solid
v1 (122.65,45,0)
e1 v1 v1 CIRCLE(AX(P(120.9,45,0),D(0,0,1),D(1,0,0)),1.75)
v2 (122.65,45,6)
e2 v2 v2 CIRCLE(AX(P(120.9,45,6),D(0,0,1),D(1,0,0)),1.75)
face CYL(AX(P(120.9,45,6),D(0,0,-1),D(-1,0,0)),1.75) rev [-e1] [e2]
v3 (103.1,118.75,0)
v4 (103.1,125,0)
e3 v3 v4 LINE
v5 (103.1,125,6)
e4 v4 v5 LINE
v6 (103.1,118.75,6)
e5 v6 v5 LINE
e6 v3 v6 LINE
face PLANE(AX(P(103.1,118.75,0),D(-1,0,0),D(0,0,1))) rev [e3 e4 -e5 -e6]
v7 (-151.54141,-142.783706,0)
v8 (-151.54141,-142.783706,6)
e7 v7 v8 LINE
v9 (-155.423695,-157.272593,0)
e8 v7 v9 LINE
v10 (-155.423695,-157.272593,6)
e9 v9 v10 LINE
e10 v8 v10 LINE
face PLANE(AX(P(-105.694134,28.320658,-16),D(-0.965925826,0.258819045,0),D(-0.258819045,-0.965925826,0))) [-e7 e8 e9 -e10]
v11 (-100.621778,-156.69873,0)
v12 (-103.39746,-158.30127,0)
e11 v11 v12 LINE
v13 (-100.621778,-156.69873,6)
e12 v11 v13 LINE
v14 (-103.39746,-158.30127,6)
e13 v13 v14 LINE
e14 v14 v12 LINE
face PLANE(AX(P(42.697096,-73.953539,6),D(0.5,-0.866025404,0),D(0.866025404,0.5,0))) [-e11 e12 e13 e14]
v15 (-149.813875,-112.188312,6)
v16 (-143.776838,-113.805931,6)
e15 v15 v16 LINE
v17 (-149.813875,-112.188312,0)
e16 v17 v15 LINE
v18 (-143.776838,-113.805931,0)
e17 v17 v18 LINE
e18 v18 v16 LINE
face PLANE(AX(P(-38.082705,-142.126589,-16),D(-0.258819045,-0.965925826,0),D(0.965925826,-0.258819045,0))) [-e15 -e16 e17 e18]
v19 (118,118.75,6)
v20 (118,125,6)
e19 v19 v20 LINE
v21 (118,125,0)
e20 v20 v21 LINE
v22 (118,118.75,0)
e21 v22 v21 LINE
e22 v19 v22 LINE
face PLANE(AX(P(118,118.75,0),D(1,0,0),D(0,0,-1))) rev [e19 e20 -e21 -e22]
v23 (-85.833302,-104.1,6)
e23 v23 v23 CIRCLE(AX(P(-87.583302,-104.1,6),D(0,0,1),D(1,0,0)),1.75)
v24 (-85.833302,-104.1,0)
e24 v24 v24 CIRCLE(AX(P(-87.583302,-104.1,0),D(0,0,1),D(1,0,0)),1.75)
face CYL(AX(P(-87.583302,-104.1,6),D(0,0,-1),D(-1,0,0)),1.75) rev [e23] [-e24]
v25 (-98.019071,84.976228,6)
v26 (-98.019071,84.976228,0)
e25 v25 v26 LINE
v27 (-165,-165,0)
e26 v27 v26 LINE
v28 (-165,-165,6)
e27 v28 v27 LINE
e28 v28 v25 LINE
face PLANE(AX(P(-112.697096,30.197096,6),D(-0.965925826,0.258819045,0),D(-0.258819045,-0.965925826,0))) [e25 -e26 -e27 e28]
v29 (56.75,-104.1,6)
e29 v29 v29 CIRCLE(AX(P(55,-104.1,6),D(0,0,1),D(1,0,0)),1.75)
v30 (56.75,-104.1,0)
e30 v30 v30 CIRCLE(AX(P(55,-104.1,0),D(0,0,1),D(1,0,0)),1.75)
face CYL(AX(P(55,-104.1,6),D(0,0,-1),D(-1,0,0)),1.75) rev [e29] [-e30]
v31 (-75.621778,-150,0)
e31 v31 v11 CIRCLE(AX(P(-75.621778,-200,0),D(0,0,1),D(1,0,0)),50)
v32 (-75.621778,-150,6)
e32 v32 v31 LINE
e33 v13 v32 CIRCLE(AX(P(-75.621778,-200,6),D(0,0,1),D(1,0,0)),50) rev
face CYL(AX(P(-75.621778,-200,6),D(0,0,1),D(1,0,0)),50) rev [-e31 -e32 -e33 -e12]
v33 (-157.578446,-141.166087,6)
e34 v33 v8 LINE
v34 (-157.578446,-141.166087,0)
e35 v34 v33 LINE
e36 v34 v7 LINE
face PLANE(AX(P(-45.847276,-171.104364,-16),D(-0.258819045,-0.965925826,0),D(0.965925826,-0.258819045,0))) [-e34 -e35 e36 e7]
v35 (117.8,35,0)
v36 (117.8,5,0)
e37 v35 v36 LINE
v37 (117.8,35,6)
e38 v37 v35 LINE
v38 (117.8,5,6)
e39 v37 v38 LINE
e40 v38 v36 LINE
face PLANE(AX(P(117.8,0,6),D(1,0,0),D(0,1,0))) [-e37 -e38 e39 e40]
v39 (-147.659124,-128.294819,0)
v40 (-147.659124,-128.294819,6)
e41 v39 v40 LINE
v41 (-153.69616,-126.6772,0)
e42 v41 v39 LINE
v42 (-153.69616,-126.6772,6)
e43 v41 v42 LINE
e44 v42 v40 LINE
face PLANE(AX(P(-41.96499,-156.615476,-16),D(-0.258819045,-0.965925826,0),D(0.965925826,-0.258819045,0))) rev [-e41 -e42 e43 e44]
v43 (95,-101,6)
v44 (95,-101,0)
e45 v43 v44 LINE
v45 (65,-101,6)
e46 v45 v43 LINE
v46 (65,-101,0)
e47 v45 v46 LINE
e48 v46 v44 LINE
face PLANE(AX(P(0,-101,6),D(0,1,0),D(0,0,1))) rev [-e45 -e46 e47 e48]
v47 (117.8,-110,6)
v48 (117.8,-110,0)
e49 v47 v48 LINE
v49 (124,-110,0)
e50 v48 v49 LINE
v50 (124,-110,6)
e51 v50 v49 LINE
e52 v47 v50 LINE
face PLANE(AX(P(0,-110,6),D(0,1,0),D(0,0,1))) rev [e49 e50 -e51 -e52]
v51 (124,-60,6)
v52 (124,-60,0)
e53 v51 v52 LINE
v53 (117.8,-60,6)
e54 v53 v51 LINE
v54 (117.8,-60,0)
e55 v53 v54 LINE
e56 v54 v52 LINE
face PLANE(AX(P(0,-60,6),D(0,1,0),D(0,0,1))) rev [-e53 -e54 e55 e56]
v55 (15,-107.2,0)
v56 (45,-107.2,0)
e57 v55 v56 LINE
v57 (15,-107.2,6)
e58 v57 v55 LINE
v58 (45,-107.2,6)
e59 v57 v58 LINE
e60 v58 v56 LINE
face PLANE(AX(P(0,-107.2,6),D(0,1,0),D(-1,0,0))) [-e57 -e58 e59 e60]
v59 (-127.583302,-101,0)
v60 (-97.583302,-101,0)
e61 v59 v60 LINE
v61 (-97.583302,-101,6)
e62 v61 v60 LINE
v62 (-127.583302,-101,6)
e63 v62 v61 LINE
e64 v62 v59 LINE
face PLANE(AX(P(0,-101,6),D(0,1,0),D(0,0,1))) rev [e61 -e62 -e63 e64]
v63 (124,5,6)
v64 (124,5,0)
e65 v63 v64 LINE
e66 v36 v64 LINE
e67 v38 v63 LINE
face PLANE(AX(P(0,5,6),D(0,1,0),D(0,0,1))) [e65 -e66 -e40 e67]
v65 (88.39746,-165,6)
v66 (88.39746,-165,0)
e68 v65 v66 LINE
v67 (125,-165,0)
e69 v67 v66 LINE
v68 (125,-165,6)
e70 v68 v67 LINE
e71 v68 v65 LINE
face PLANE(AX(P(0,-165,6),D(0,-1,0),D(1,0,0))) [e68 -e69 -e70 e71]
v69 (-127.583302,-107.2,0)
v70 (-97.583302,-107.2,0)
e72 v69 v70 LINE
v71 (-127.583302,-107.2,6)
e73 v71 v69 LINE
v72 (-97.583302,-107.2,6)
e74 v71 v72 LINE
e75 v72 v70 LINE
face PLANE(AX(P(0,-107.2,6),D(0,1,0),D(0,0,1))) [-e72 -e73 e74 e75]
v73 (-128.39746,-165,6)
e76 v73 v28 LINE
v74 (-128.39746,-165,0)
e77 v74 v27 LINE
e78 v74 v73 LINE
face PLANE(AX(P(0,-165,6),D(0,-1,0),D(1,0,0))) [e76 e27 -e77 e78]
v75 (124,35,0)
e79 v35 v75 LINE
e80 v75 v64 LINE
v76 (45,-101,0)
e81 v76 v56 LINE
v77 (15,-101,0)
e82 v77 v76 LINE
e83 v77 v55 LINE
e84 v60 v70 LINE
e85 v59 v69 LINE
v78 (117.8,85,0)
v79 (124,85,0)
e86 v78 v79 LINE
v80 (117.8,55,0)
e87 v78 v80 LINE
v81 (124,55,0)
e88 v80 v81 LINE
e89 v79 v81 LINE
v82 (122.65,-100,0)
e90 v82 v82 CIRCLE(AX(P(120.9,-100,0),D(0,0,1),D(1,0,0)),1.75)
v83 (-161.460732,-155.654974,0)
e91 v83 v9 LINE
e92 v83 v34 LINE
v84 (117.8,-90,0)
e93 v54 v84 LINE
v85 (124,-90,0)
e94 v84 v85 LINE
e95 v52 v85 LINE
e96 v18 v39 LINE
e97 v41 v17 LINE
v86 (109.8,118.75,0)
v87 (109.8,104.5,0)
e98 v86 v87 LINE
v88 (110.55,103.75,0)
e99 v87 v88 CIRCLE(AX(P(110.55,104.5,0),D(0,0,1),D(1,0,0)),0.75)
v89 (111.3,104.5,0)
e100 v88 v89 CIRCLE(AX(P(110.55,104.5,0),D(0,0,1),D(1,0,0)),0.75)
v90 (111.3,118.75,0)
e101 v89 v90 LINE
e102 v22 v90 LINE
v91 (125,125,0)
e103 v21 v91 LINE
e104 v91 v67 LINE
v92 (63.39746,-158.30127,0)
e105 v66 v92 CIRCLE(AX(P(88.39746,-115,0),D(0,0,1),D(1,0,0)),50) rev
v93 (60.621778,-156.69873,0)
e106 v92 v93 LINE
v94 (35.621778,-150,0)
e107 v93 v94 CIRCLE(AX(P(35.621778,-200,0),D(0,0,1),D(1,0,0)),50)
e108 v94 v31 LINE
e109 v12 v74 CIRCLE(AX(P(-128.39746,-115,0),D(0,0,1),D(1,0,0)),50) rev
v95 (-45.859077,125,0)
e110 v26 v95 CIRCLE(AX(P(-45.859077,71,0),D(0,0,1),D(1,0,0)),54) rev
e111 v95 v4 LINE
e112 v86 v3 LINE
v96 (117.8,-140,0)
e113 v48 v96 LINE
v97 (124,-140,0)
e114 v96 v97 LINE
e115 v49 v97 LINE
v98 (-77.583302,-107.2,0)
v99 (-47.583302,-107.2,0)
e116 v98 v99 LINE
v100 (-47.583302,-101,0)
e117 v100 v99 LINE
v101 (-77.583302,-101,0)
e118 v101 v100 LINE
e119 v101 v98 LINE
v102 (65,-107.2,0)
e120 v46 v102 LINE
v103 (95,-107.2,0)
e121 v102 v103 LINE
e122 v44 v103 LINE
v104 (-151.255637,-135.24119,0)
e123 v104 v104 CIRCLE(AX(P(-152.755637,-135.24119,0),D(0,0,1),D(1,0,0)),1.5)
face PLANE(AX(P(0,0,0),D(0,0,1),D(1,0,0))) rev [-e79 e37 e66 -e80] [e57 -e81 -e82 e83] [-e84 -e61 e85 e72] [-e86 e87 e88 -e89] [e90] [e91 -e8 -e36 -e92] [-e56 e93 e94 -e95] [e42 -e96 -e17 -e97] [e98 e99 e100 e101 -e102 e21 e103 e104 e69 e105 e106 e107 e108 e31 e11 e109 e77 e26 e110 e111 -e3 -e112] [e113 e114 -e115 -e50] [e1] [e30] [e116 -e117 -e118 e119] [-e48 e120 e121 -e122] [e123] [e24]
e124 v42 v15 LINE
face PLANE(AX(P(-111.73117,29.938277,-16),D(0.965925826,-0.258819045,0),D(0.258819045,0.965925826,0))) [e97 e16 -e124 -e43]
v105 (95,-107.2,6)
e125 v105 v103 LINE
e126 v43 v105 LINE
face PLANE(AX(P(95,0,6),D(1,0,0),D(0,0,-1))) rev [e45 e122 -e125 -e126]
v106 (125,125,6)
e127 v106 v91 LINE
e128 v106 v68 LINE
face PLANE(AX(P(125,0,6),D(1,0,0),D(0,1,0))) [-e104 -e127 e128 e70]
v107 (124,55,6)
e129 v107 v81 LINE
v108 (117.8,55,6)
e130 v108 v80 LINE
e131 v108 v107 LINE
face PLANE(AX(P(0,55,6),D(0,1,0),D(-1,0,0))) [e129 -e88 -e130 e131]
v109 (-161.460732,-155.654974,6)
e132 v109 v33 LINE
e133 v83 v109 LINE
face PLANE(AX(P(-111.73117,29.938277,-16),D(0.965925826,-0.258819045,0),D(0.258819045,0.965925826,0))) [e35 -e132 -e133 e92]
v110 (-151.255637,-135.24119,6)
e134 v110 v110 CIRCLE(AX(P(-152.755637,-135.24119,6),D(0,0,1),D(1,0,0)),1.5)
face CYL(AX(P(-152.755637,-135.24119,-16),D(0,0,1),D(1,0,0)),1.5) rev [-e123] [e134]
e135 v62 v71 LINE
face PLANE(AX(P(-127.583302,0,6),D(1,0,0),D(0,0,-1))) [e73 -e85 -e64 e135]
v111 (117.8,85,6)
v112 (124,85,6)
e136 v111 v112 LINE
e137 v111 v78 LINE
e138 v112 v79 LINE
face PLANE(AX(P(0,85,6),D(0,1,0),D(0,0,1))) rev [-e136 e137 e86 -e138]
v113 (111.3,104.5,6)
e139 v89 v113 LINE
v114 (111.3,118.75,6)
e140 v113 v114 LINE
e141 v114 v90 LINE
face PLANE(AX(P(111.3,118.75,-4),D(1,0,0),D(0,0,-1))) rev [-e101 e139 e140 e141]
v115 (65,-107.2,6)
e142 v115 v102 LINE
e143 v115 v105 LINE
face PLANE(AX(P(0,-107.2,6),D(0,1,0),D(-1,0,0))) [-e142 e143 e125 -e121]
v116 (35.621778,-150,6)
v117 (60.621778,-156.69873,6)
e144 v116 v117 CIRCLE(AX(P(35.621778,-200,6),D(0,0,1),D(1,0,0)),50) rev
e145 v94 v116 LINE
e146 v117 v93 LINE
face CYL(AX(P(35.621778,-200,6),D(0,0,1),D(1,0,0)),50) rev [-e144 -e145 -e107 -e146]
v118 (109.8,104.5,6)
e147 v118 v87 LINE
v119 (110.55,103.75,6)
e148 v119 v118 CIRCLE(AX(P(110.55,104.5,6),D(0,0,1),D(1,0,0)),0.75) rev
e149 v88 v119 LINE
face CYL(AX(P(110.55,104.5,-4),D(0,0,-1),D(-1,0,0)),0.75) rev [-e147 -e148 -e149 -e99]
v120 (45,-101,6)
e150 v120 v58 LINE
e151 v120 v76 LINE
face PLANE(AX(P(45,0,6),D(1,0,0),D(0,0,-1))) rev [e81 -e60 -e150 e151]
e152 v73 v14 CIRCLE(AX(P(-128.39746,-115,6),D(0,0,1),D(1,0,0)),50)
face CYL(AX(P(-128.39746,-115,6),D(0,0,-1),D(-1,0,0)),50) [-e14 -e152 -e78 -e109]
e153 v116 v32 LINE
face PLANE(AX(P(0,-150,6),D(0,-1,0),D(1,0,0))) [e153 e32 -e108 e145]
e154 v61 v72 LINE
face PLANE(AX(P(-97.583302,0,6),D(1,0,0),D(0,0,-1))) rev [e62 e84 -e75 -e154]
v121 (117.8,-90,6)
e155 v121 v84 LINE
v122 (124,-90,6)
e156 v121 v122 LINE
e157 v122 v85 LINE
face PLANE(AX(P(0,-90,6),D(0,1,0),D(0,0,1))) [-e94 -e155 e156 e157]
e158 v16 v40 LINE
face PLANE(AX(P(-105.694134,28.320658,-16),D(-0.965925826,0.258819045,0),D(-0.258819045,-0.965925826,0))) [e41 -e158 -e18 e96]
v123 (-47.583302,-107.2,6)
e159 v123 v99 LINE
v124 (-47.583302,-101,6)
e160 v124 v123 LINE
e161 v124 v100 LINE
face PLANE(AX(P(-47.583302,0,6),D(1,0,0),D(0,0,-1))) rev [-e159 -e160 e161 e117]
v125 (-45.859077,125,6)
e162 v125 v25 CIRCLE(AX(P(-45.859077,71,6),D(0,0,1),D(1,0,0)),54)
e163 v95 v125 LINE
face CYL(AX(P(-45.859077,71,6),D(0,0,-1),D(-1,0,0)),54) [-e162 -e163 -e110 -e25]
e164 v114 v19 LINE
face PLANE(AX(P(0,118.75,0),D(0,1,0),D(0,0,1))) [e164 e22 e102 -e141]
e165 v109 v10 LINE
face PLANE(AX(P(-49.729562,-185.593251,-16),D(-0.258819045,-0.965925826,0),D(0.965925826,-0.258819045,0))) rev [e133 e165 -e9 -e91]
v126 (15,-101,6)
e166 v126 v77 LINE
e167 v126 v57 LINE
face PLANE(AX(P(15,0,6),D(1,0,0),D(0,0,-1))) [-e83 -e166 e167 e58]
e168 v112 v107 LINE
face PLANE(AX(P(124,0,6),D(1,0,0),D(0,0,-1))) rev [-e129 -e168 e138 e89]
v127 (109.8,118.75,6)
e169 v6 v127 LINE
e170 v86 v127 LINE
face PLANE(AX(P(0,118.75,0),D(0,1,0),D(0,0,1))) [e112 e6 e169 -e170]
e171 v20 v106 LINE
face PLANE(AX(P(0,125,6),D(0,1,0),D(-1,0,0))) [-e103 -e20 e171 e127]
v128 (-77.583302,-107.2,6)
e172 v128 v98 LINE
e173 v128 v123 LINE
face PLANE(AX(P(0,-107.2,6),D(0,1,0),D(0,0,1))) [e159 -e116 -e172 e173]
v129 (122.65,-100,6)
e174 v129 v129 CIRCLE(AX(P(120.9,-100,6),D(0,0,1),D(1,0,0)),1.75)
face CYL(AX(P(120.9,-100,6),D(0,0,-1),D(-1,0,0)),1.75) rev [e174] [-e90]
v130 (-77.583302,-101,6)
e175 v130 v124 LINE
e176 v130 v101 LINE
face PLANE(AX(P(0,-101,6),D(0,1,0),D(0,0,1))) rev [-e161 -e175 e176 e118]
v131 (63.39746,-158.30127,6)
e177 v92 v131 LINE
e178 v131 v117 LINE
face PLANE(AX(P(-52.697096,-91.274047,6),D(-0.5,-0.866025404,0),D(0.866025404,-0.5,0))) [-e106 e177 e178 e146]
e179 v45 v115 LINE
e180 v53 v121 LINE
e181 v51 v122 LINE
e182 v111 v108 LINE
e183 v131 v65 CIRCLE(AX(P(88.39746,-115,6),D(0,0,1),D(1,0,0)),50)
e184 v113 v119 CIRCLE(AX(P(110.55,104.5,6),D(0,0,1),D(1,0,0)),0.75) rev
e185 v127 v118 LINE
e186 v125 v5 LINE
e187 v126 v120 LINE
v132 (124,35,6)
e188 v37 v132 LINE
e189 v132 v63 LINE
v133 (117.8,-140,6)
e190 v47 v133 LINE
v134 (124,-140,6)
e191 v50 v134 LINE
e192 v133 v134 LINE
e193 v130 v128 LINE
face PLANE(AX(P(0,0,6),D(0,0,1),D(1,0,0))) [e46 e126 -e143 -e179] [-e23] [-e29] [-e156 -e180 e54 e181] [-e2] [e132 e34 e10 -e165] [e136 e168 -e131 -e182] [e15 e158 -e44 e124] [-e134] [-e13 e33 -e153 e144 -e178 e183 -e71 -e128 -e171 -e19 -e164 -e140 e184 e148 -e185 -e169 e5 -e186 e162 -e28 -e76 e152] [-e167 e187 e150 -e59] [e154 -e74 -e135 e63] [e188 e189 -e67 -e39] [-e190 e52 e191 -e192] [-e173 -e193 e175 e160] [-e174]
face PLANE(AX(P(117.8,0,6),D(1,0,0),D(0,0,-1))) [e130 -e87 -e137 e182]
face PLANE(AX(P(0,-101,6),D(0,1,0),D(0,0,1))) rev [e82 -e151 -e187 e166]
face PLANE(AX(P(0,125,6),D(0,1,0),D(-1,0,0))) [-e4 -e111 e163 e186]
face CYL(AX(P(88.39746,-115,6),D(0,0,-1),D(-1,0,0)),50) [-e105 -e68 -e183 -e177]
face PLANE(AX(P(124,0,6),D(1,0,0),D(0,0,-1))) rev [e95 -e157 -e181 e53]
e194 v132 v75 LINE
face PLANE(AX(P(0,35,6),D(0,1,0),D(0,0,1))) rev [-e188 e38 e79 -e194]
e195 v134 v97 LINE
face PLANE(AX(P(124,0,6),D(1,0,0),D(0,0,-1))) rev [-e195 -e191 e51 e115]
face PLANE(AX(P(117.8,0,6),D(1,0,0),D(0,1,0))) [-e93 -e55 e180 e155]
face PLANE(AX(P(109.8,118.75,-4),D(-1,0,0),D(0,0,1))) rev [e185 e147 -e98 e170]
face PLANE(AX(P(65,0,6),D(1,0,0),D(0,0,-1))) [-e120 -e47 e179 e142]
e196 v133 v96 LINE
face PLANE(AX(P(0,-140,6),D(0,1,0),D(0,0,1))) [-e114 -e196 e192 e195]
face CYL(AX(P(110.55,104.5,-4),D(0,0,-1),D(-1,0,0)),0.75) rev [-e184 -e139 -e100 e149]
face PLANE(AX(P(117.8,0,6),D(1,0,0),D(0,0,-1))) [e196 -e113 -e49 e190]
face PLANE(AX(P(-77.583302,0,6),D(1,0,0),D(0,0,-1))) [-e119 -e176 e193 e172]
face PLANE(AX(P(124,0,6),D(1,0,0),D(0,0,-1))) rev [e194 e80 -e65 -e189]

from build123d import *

# Parameters (mm, degrees)
ESBO_O1_R                = 1.75
ESBO_O1_W                = 30
ESBO_O1_H                = 6.2
ESBO_O1_W_2              = 6.2
ESBO_O1_H_2              = 30
RESSALTO_EXTRUS_O1_DEPTH = 6
FILETE1_R                = 54
FILETE2_R                = 50
ESBO_O2_W                = 14.9
ESBO_O2_H                = 6
CORTE_EXTRUS_O1_DEPTH    = 6.25
ESBO_O3_W                = 1.5
ESBO_O3_H                = 15
CORTE_EXTRUS_O2_DEPTH    = 10
FILETE3_R                = 0.75
CORTE_EXTRUS_O3_DEPTH    = 22


with BuildPart() as part:
    # Esboço1 → Ressalto-extrusão1 (new body)
    with BuildSketch(Plane.XY):
        Polygon((125, -165), (75, -165), (49.019237886, -150), (-89.019237886, -150), (-115, -165), (-165, -165), (-87.294734195, 125), (125, 125), align=None)
        with Locations((-87.583302492, -104.1)):
            Circle(ESBO_O1_R, mode=Mode.SUBTRACT)
        with Locations((120.9, 45)):
            Circle(ESBO_O1_R, mode=Mode.SUBTRACT)
        with Locations((55, -104.1)):
            Circle(ESBO_O1_R, mode=Mode.SUBTRACT)
        with Locations((120.9, -100)):
            Circle(ESBO_O1_R, mode=Mode.SUBTRACT)
        with Locations((80, -104.1)):
            Rectangle(ESBO_O1_W, ESBO_O1_H, mode=Mode.SUBTRACT)
        with Locations((30, -104.1)):
            Rectangle(ESBO_O1_W, ESBO_O1_H, mode=Mode.SUBTRACT)
        with Locations((-112.583302492, -104.1)):
            Rectangle(ESBO_O1_W, ESBO_O1_H, mode=Mode.SUBTRACT)
        with Locations((-62.583302492, -104.1)):
            Rectangle(ESBO_O1_W, ESBO_O1_H, mode=Mode.SUBTRACT)
        with Locations((120.9, 70)):
            Rectangle(ESBO_O1_W_2, ESBO_O1_H_2, mode=Mode.SUBTRACT)
        with Locations((120.9, 20)):
            Rectangle(ESBO_O1_W_2, ESBO_O1_H_2, mode=Mode.SUBTRACT)
        with Locations((120.9, -125)):
            Rectangle(ESBO_O1_W_2, ESBO_O1_H_2, mode=Mode.SUBTRACT)
        with Locations((120.9, -75)):
            Rectangle(ESBO_O1_W_2, ESBO_O1_H_2, mode=Mode.SUBTRACT)
    extrude(amount=RESSALTO_EXTRUS_O1_DEPTH)

    # Filete1
    filete1_edges = [part.edges().sort_by_distance(p)[0] for p in [
        (-87.294734195, 125, 3),
    ]]
    fillet(filete1_edges, radius=FILETE1_R)

    # Filete2
    filete2_edges = [part.edges().sort_by_distance(p)[0] for p in [
        (75, -165, 3),
        (49.019237886, -150, 3),
        (-89.019237886, -150, 3),
        (-115, -165, 3),
    ]]
    fillet(filete2_edges, radius=FILETE2_R)

    # Esboço2 → Corte-extrusão1 (cut)
    with BuildSketch(Plane(origin=(0, 125, 0), x_dir=(1, 0, 0), z_dir=(0, 1, 0))):
        with Locations((110.55, -3)):
            Rectangle(ESBO_O2_W, ESBO_O2_H)
    extrude(amount=-CORTE_EXTRUS_O1_DEPTH, mode=Mode.SUBTRACT)

    # Esboço3 → Corte-extrusão2 (cut)
    with BuildSketch(Plane.XY.offset(6)):
        with Locations((110.55, 111.25)):
            Rectangle(ESBO_O3_W, ESBO_O3_H)
    extrude(amount=-CORTE_EXTRUS_O2_DEPTH, mode=Mode.SUBTRACT)

    # Filete3
    filete3_edges = [part.edges().sort_by_distance(p)[0] for p in [
        (111.3, 103.75, 3),
        (109.8, 103.75, 3),
    ]]
    fillet(filete3_edges, radius=FILETE3_R - 0.0001)  # a hair under: the kernel refuses the full size

    # Esboço4 → Corte-extrusão3 (cut)
    with BuildSketch(Plane.XY.offset(6)):
        Polygon((-149.813874716, -112.188312175), (-153.696160392, -126.677199569), (-150.677642185, -127.486009085), (-146.795356509, -112.997121691), align=None)
        Polygon((-146.795356509, -112.997121691), (-150.677642185, -127.486009085), (-147.659123978, -128.294818601), (-143.776838302, -113.805931207), align=None)
        with BuildLine():
            ThreePointArc((-152.367408211, -133.792301745), (-154.204525518, -134.852961916), (-153.143865346, -136.690079223))
            Line((-153.143865346, -136.690079223), (-152.367408211, -133.792301745))
        make_face()
        with BuildLine():
            Line((-152.367408211, -133.792301745), (-153.143865346, -136.690079223))
            ThreePointArc((-153.143865346, -136.690079223), (-151.842494635, -136.431220494), (-151.255636778, -135.241190484))
            ThreePointArc((-151.255636778, -135.241190484), (-151.565606768, -134.328048341), (-152.367408211, -133.792301745))
        make_face()
        Polygon((-157.578446069, -141.166086963), (-161.460731746, -155.654974358), (-158.442213538, -156.463783874), (-154.559927862, -141.974896479), align=None)
        Polygon((-154.559927862, -141.974896479), (-158.442213538, -156.463783874), (-155.423695331, -157.27259339), (-151.541409655, -142.783705995), align=None)
    extrude(amount=-CORTE_EXTRUS_O3_DEPTH, mode=Mode.SUBTRACT)


solid = part.part
